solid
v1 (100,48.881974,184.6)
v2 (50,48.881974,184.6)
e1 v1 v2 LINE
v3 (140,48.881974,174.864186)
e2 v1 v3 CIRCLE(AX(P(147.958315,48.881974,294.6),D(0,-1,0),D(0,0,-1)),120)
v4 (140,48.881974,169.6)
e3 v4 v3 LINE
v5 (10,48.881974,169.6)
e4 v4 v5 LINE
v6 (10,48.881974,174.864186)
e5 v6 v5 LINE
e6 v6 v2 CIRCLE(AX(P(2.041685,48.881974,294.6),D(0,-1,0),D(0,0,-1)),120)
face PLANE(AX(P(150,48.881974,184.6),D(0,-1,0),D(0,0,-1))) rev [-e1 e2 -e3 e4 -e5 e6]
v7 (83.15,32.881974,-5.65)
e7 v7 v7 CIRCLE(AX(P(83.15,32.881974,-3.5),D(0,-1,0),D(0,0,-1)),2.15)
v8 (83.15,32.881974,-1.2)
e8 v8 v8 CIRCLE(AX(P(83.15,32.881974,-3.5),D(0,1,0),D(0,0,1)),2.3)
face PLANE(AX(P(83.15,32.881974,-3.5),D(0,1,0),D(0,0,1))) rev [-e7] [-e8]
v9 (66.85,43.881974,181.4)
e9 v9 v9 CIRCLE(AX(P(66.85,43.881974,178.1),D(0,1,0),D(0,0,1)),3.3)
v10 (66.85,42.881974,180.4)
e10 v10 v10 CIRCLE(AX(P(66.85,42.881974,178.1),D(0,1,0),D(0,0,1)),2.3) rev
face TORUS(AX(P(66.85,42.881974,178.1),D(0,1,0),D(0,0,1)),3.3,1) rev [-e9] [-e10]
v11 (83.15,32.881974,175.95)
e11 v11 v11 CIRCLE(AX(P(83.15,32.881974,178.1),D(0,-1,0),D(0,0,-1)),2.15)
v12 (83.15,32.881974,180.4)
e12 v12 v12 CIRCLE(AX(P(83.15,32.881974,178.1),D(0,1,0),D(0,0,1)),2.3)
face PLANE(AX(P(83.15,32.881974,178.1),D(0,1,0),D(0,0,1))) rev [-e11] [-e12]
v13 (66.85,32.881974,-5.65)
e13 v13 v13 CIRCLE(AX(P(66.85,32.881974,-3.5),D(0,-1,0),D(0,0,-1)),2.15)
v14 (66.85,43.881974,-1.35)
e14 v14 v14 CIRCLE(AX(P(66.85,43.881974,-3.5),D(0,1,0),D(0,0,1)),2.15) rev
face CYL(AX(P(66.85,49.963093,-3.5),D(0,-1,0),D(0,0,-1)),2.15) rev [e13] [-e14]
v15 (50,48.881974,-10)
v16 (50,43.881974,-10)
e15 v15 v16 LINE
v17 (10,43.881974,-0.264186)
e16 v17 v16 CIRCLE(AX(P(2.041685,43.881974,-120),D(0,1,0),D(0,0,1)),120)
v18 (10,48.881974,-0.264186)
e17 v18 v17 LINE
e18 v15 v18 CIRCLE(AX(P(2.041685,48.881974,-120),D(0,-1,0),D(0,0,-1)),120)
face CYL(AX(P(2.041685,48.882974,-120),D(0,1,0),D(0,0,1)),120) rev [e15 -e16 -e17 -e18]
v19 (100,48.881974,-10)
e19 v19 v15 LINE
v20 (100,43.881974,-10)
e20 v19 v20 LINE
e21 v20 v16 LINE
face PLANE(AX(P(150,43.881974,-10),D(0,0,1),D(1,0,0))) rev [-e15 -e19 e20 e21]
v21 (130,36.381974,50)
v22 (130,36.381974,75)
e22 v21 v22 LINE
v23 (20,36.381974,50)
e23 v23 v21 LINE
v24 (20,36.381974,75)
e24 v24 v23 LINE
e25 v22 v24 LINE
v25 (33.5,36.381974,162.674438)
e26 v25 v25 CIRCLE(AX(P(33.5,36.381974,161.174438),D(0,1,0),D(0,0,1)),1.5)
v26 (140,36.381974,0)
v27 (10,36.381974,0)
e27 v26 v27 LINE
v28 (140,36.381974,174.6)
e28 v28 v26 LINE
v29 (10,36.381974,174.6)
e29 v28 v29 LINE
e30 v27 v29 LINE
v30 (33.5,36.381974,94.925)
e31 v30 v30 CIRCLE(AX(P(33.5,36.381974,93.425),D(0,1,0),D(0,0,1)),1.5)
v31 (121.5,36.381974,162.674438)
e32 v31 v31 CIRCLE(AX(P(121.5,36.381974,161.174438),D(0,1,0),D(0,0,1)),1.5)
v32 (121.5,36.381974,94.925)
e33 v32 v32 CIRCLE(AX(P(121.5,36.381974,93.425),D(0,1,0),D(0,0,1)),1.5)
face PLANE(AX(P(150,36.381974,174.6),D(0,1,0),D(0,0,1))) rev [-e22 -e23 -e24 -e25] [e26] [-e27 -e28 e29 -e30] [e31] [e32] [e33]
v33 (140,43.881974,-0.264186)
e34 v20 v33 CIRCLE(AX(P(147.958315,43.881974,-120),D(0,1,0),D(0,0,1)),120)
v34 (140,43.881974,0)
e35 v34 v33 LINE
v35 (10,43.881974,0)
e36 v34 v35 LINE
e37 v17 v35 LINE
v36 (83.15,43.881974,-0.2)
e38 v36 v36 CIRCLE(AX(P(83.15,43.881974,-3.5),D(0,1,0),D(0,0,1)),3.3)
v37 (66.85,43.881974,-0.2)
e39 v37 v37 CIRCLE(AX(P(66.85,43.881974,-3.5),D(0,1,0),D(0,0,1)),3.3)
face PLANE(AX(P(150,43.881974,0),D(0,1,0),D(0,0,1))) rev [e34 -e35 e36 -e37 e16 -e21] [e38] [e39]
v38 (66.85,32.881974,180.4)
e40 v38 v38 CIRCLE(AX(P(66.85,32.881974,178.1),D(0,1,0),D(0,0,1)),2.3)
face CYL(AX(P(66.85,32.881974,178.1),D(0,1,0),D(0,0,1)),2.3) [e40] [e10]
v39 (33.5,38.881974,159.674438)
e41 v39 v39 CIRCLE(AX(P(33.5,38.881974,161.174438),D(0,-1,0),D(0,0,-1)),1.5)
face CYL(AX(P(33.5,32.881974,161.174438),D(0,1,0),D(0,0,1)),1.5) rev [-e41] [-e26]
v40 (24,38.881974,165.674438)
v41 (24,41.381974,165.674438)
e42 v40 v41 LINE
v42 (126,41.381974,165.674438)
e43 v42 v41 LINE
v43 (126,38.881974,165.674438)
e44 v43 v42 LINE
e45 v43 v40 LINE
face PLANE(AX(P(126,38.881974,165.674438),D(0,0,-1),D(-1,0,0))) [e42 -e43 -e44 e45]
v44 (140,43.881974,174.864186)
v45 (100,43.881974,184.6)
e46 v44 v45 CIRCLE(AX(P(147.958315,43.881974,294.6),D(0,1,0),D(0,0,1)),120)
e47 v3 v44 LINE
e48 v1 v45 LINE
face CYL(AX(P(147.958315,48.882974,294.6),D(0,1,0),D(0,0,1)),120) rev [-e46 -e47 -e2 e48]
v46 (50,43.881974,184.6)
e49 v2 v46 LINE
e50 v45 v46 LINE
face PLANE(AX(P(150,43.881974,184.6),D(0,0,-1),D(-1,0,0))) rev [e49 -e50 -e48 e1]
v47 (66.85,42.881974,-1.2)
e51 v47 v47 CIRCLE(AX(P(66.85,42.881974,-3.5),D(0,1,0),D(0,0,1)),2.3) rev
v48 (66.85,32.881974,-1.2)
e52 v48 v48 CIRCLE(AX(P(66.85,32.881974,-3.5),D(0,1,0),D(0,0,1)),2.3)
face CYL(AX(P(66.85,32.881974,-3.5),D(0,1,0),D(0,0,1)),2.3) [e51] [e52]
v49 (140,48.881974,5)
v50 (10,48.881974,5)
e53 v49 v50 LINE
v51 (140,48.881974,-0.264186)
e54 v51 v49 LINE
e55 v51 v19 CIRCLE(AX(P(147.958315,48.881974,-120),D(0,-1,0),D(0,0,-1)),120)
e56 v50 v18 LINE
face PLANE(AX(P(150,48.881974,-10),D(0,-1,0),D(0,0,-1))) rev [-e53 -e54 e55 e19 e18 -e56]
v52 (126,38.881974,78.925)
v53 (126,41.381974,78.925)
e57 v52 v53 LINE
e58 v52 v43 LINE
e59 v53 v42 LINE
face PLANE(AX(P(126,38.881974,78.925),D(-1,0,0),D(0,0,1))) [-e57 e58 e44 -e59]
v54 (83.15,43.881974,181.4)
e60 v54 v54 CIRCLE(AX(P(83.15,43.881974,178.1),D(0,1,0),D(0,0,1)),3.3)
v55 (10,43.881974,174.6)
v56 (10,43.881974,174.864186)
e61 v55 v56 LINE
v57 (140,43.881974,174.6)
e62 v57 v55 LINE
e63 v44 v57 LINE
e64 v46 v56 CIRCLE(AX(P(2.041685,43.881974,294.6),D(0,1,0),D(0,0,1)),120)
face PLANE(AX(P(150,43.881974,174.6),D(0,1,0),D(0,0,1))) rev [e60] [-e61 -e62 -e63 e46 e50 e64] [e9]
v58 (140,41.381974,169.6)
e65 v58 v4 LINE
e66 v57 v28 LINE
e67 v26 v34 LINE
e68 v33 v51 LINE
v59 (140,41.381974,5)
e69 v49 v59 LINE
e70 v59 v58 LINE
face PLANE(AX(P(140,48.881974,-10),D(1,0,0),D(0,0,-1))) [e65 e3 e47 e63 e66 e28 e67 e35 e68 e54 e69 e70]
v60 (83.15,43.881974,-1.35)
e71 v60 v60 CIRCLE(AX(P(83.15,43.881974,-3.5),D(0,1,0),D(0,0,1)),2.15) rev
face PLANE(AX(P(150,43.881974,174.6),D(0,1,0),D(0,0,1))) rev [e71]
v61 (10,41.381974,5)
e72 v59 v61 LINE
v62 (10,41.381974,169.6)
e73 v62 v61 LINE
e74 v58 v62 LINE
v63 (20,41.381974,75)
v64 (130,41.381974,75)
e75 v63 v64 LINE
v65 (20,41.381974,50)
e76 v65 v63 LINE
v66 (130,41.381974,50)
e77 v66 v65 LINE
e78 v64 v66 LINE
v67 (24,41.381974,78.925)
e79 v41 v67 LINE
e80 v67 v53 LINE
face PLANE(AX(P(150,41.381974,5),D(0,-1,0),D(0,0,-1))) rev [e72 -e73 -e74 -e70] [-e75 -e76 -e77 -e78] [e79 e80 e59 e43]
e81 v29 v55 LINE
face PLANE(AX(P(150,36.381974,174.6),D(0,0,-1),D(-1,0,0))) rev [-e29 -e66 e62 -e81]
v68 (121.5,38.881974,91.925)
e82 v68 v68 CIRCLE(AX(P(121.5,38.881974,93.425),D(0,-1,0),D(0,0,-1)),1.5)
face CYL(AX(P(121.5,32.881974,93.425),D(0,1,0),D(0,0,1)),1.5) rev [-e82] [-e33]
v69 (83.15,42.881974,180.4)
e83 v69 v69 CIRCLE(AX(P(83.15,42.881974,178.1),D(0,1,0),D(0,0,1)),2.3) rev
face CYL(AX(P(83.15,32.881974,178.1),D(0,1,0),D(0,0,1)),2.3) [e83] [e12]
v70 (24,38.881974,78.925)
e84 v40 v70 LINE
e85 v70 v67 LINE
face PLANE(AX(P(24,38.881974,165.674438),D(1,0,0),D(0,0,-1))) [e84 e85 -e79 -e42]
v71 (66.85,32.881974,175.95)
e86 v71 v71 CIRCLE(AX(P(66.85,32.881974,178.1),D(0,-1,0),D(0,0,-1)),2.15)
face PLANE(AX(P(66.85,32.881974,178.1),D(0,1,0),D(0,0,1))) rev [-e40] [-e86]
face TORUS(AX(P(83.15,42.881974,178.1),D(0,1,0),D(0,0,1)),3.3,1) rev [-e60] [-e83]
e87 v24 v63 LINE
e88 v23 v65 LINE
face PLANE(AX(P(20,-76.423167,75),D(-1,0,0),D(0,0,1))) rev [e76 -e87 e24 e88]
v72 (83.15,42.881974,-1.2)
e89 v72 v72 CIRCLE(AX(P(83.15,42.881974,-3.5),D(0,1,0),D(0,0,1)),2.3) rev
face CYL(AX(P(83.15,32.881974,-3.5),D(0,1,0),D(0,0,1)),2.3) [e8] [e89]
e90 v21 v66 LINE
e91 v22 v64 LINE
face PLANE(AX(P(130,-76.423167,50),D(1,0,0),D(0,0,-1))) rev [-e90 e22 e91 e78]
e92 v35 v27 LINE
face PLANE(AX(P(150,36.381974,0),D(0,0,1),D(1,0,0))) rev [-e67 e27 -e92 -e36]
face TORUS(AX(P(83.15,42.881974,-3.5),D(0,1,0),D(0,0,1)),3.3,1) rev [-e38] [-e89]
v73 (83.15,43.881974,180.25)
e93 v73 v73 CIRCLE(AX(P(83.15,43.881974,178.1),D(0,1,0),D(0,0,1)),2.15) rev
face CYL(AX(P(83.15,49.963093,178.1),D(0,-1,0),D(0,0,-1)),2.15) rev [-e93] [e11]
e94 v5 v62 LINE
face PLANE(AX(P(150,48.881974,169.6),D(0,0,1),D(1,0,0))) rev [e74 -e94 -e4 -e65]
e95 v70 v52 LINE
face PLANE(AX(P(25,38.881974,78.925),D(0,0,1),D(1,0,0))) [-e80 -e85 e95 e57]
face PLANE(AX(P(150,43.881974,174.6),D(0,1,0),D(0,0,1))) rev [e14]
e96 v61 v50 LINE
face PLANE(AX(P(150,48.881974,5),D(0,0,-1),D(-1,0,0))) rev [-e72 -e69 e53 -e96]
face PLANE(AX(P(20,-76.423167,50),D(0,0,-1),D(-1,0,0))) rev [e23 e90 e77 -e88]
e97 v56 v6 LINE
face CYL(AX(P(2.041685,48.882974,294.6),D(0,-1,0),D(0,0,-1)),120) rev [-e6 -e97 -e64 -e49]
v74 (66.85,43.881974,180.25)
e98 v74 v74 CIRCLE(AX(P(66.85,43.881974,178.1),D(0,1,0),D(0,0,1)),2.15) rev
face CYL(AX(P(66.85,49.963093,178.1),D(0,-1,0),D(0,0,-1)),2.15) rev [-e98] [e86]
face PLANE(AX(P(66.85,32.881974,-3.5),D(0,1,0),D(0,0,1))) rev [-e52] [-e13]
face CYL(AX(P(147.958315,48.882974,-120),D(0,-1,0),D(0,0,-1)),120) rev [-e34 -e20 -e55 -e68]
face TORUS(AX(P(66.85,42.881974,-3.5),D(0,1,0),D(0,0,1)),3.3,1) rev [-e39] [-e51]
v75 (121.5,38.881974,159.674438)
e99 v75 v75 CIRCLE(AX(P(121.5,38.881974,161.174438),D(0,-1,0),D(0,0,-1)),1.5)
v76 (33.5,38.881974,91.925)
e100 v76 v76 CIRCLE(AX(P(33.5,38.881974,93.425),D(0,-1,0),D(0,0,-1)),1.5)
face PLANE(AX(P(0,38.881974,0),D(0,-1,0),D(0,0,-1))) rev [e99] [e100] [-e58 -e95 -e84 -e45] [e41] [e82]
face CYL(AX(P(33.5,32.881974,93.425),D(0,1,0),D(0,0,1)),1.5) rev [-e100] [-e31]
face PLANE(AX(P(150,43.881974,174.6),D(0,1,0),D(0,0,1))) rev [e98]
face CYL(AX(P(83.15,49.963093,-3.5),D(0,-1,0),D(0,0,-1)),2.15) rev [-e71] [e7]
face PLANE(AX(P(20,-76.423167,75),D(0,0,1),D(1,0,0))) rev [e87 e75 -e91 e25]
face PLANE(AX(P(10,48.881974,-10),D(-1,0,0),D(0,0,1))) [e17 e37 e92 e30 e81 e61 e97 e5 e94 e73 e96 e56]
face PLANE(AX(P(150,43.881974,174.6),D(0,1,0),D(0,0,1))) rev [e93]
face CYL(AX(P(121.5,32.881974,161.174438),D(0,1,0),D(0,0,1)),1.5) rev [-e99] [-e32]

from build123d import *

# Parameters (mm, degrees)
BOSS_EXTRUDE1_DEPTH     = 150
CUT_EXTRUDE2_REACH      = 244.83
SKETCH2_W               = 50
SKETCH2_H               = 10
FILLET1_R               = 120
SKETCH4_R               = 2.3
BOSS_EXTRUDE2_DEPTH     = 16
SKETCH7_R               = 2.15
CUT_EXTRUDE4_DEPTH      = 11
SKETCH8_W               = 110
SKETCH8_H               = 25
CUT_EXTRUDE5_DEPTH      = 5
CUT_EXTRUDE6_DEPTH      = 2.5
SKETCH10_3_R            = 1.5
CUT_EXTRUDE7_DEPTH      = 239.011365275
FILLET2_R               = 1
CUT_EXTRUDE8_DEPTH      = 239.011365275
CUT_EXTRUDE8_DEPTH_BACK = 239.011365275
SKETCH11_W              = 10
SKETCH11_H              = 194.6


with BuildPart() as part:
    # Sketch1 → Boss-Extrude1 (new body)
    with BuildSketch(Plane(origin=(0, 0, 0), x_dir=(0, 0, -1), z_dir=(1, 0, 0))):
        Polygon((-174.6, 36.381974353), (-174.6, 43.881974353), (-184.6, 43.881974353), (-184.6, 48.881974353), (-169.6, 48.881974353), (-169.6, 41.381974353), (-5, 41.381974353), (-5, 48.881974353), (10, 48.881974353), (10, 43.881974353), (0, 43.881974353), (0, 36.381974353), align=None)
    extrude(amount=BOSS_EXTRUDE1_DEPTH)

    # Sketch2 → Cut-Extrude2 (cut, up to next)
    with BuildSketch(Plane(origin=(0, 0, 0), x_dir=(1, 0, 0), z_dir=(0, 1, 0)), mode=Mode.PRIVATE) as cut_extrude2_sk1:
        with Locations((25, 5)):
            Rectangle(SKETCH2_W, SKETCH2_H)
    cut_extrude2_tool1 = extrude(cut_extrude2_sk1.sketch, amount=CUT_EXTRUDE2_REACH, mode=Mode.PRIVATE) & part.part
    # Sketch2 → Cut-Extrude2 (cut, up to next)
    with BuildSketch(Plane(origin=(0, 0, 0), x_dir=(1, 0, 0), z_dir=(0, 1, 0)), mode=Mode.PRIVATE) as cut_extrude2_sk2:
        with Locations((125, 5)):
            Rectangle(SKETCH2_W, SKETCH2_H)
    cut_extrude2_tool2 = extrude(cut_extrude2_sk2.sketch, amount=CUT_EXTRUDE2_REACH, mode=Mode.PRIVATE) & part.part
    # Sketch2 → Cut-Extrude2 (cut, up to next)
    with BuildSketch(Plane(origin=(0, 0, 0), x_dir=(1, 0, 0), z_dir=(0, 1, 0)), mode=Mode.PRIVATE) as cut_extrude2_sk3:
        with Locations((25, -179.6)):
            Rectangle(SKETCH2_W, SKETCH2_H)
    cut_extrude2_tool3 = extrude(cut_extrude2_sk3.sketch, amount=CUT_EXTRUDE2_REACH, mode=Mode.PRIVATE) & part.part
    # Sketch2 → Cut-Extrude2 (cut, up to next)
    with BuildSketch(Plane(origin=(0, 0, 0), x_dir=(1, 0, 0), z_dir=(0, 1, 0)), mode=Mode.PRIVATE) as cut_extrude2_sk4:
        with Locations((125, -179.6)):
            Rectangle(SKETCH2_W, SKETCH2_H)
    cut_extrude2_tool4 = extrude(cut_extrude2_sk4.sketch, amount=CUT_EXTRUDE2_REACH, mode=Mode.PRIVATE) & part.part
    add(cut_extrude2_tool1.solids().sort_by_distance((25, 0, -5))[0], mode=Mode.SUBTRACT)
    add(cut_extrude2_tool2.solids().sort_by_distance((125, 0, -5))[0], mode=Mode.SUBTRACT)
    add(cut_extrude2_tool3.solids().sort_by_distance((25, 0, 179.6))[0], mode=Mode.SUBTRACT)
    add(cut_extrude2_tool4.solids().sort_by_distance((125, 0, 179.6))[0], mode=Mode.SUBTRACT)

    # Fillet1
    # the kernel refuses this fillet: 120 mm, written as the material it adds along each edge
    with BuildSketch(Plane(origin=(50, 43.881974353, 174.6), x_dir=(-1, 0, 0), z_dir=(0, 1, 0)), Plane(origin=(100, 43.881974353, 0), x_dir=(1, 0, 0), z_dir=(0, 1, 0))) as fillet1_piece_1:
        with BuildLine():
            CenterArc((47.958315233, 120), FILLET1_R, 246.443535691, 23.556464309)
            Line((0, 10), (0, 0))
            Line((0, 0), (47.958315233, 0))
        make_face()
    extrude(amount=5)
    with BuildSketch(Plane(origin=(100, 43.881974353, 174.6), x_dir=(1, 0, 0), z_dir=(0, 1, 0)), Plane(origin=(50, 43.881974353, 0), x_dir=(-1, 0, 0), z_dir=(0, 1, 0))) as fillet1_piece_2:
        with BuildLine():
            CenterArc((47.958315233, -120), FILLET1_R, 90, 23.556464309)
            Line((0, -10), (0, 0))
            Line((0, 0), (47.958315233, 0))
        make_face()
    extrude(amount=5)

    # Sketch4 → Boss-Extrude2 (add)
    with BuildSketch(Plane(origin=(0, 48.881974353, 0), x_dir=(1, 0, 0), z_dir=(0, 1, 0))):
        with Locations(Location((66.85, -178.1, 0), (0, 0, 270))):
            Circle(SKETCH4_R)
        with Locations(Location((83.15, -178.1, 0), (0, 0, 270))):
            Circle(SKETCH4_R)
        with Locations(Location((83.15, 3.5, 0), (0, 0, 270))):
            Circle(SKETCH4_R)
        with Locations(Location((66.85, 3.5, 0), (0, 0, 270))):
            Circle(SKETCH4_R)
    extrude(amount=-BOSS_EXTRUDE2_DEPTH)

    # Sketch7 → Cut-Extrude4 (cut)
    with BuildSketch(Plane.XZ.offset(-32.881974353)):
        with Locations(Location((66.85, 178.1, 0), (0, 0, 270))):
            Circle(SKETCH7_R)
        with Locations(Location((83.15, 178.1, 0), (0, 0, 270))):
            Circle(SKETCH7_R)
        with Locations(Location((66.85, -3.5, 0), (0, 0, 270))):
            Circle(SKETCH7_R)
        with Locations(Location((83.15, -3.5, 0), (0, 0, 270))):
            Circle(SKETCH7_R)
    extrude(amount=-CUT_EXTRUDE4_DEPTH, mode=Mode.SUBTRACT)

    # Sketch8 → Cut-Extrude5 (cut)
    with BuildSketch(Plane(origin=(0, 41.381974353, 0), x_dir=(1, 0, 0), z_dir=(0, 1, 0))):
        with Locations((75, -62.5)):
            Rectangle(SKETCH8_W, SKETCH8_H)
    extrude(amount=-CUT_EXTRUDE5_DEPTH, mode=Mode.SUBTRACT)

    # Sketch10 → Cut-Extrude6 (cut)
    with BuildSketch(Plane(origin=(0, 41.381974353, 0), x_dir=(1, 0, 0), z_dir=(0, 1, 0))):
        Polygon((25, -78.925), (126, -78.925), (126, -165.67443804), (24, -165.67443804), (24, -78.925), align=None)
    extrude(amount=-CUT_EXTRUDE6_DEPTH, mode=Mode.SUBTRACT)

    # Sketch10<3> → Cut-Extrude7 (cut, through all)
    with BuildSketch(Plane(origin=(0, 41.381974353, 0), x_dir=(1, 0, 0), z_dir=(0, 1, 0))):
        with Locations(Location((33.5, -93.425, 0), (0, 0, 270))):
            Circle(SKETCH10_3_R)
        with Locations(Location((121.5, -93.425, 0), (0, 0, 270))):
            Circle(SKETCH10_3_R)
        with Locations(Location((121.5, -161.17443804, 0), (0, 0, 270))):
            Circle(SKETCH10_3_R)
        with Locations(Location((33.5, -161.17443804, 0), (0, 0, 270))):
            Circle(SKETCH10_3_R)
    extrude(amount=-CUT_EXTRUDE7_DEPTH, mode=Mode.SUBTRACT)

    # Fillet2
    fillet2_edges = [part.edges().sort_by_distance(p)[0] for p in [
        (66.85, 43.881974353, 175.8),
        (83.15, 43.881974353, 175.8),
        (83.15, 43.881974353, -5.8),
        (66.85, 43.881974353, -5.8),
    ]]
    fillet(fillet2_edges, radius=FILLET2_R)

    # Sketch11 → Cut-Extrude8 (cut, two sides: drawn at the far end of the back side and taken through both)
    with BuildSketch(Plane(origin=(0, 41.381974353, 0), x_dir=(1, 0, 0), z_dir=(0, 1, 0)).offset(-CUT_EXTRUDE8_DEPTH_BACK)):
        with Locations((5, -87.3)):
            Rectangle(SKETCH11_W, SKETCH11_H)
        with Locations((145, -87.3)):
            Rectangle(SKETCH11_W, SKETCH11_H)
    extrude(amount=CUT_EXTRUDE8_DEPTH + CUT_EXTRUDE8_DEPTH_BACK, mode=Mode.SUBTRACT)


solid = part.part
